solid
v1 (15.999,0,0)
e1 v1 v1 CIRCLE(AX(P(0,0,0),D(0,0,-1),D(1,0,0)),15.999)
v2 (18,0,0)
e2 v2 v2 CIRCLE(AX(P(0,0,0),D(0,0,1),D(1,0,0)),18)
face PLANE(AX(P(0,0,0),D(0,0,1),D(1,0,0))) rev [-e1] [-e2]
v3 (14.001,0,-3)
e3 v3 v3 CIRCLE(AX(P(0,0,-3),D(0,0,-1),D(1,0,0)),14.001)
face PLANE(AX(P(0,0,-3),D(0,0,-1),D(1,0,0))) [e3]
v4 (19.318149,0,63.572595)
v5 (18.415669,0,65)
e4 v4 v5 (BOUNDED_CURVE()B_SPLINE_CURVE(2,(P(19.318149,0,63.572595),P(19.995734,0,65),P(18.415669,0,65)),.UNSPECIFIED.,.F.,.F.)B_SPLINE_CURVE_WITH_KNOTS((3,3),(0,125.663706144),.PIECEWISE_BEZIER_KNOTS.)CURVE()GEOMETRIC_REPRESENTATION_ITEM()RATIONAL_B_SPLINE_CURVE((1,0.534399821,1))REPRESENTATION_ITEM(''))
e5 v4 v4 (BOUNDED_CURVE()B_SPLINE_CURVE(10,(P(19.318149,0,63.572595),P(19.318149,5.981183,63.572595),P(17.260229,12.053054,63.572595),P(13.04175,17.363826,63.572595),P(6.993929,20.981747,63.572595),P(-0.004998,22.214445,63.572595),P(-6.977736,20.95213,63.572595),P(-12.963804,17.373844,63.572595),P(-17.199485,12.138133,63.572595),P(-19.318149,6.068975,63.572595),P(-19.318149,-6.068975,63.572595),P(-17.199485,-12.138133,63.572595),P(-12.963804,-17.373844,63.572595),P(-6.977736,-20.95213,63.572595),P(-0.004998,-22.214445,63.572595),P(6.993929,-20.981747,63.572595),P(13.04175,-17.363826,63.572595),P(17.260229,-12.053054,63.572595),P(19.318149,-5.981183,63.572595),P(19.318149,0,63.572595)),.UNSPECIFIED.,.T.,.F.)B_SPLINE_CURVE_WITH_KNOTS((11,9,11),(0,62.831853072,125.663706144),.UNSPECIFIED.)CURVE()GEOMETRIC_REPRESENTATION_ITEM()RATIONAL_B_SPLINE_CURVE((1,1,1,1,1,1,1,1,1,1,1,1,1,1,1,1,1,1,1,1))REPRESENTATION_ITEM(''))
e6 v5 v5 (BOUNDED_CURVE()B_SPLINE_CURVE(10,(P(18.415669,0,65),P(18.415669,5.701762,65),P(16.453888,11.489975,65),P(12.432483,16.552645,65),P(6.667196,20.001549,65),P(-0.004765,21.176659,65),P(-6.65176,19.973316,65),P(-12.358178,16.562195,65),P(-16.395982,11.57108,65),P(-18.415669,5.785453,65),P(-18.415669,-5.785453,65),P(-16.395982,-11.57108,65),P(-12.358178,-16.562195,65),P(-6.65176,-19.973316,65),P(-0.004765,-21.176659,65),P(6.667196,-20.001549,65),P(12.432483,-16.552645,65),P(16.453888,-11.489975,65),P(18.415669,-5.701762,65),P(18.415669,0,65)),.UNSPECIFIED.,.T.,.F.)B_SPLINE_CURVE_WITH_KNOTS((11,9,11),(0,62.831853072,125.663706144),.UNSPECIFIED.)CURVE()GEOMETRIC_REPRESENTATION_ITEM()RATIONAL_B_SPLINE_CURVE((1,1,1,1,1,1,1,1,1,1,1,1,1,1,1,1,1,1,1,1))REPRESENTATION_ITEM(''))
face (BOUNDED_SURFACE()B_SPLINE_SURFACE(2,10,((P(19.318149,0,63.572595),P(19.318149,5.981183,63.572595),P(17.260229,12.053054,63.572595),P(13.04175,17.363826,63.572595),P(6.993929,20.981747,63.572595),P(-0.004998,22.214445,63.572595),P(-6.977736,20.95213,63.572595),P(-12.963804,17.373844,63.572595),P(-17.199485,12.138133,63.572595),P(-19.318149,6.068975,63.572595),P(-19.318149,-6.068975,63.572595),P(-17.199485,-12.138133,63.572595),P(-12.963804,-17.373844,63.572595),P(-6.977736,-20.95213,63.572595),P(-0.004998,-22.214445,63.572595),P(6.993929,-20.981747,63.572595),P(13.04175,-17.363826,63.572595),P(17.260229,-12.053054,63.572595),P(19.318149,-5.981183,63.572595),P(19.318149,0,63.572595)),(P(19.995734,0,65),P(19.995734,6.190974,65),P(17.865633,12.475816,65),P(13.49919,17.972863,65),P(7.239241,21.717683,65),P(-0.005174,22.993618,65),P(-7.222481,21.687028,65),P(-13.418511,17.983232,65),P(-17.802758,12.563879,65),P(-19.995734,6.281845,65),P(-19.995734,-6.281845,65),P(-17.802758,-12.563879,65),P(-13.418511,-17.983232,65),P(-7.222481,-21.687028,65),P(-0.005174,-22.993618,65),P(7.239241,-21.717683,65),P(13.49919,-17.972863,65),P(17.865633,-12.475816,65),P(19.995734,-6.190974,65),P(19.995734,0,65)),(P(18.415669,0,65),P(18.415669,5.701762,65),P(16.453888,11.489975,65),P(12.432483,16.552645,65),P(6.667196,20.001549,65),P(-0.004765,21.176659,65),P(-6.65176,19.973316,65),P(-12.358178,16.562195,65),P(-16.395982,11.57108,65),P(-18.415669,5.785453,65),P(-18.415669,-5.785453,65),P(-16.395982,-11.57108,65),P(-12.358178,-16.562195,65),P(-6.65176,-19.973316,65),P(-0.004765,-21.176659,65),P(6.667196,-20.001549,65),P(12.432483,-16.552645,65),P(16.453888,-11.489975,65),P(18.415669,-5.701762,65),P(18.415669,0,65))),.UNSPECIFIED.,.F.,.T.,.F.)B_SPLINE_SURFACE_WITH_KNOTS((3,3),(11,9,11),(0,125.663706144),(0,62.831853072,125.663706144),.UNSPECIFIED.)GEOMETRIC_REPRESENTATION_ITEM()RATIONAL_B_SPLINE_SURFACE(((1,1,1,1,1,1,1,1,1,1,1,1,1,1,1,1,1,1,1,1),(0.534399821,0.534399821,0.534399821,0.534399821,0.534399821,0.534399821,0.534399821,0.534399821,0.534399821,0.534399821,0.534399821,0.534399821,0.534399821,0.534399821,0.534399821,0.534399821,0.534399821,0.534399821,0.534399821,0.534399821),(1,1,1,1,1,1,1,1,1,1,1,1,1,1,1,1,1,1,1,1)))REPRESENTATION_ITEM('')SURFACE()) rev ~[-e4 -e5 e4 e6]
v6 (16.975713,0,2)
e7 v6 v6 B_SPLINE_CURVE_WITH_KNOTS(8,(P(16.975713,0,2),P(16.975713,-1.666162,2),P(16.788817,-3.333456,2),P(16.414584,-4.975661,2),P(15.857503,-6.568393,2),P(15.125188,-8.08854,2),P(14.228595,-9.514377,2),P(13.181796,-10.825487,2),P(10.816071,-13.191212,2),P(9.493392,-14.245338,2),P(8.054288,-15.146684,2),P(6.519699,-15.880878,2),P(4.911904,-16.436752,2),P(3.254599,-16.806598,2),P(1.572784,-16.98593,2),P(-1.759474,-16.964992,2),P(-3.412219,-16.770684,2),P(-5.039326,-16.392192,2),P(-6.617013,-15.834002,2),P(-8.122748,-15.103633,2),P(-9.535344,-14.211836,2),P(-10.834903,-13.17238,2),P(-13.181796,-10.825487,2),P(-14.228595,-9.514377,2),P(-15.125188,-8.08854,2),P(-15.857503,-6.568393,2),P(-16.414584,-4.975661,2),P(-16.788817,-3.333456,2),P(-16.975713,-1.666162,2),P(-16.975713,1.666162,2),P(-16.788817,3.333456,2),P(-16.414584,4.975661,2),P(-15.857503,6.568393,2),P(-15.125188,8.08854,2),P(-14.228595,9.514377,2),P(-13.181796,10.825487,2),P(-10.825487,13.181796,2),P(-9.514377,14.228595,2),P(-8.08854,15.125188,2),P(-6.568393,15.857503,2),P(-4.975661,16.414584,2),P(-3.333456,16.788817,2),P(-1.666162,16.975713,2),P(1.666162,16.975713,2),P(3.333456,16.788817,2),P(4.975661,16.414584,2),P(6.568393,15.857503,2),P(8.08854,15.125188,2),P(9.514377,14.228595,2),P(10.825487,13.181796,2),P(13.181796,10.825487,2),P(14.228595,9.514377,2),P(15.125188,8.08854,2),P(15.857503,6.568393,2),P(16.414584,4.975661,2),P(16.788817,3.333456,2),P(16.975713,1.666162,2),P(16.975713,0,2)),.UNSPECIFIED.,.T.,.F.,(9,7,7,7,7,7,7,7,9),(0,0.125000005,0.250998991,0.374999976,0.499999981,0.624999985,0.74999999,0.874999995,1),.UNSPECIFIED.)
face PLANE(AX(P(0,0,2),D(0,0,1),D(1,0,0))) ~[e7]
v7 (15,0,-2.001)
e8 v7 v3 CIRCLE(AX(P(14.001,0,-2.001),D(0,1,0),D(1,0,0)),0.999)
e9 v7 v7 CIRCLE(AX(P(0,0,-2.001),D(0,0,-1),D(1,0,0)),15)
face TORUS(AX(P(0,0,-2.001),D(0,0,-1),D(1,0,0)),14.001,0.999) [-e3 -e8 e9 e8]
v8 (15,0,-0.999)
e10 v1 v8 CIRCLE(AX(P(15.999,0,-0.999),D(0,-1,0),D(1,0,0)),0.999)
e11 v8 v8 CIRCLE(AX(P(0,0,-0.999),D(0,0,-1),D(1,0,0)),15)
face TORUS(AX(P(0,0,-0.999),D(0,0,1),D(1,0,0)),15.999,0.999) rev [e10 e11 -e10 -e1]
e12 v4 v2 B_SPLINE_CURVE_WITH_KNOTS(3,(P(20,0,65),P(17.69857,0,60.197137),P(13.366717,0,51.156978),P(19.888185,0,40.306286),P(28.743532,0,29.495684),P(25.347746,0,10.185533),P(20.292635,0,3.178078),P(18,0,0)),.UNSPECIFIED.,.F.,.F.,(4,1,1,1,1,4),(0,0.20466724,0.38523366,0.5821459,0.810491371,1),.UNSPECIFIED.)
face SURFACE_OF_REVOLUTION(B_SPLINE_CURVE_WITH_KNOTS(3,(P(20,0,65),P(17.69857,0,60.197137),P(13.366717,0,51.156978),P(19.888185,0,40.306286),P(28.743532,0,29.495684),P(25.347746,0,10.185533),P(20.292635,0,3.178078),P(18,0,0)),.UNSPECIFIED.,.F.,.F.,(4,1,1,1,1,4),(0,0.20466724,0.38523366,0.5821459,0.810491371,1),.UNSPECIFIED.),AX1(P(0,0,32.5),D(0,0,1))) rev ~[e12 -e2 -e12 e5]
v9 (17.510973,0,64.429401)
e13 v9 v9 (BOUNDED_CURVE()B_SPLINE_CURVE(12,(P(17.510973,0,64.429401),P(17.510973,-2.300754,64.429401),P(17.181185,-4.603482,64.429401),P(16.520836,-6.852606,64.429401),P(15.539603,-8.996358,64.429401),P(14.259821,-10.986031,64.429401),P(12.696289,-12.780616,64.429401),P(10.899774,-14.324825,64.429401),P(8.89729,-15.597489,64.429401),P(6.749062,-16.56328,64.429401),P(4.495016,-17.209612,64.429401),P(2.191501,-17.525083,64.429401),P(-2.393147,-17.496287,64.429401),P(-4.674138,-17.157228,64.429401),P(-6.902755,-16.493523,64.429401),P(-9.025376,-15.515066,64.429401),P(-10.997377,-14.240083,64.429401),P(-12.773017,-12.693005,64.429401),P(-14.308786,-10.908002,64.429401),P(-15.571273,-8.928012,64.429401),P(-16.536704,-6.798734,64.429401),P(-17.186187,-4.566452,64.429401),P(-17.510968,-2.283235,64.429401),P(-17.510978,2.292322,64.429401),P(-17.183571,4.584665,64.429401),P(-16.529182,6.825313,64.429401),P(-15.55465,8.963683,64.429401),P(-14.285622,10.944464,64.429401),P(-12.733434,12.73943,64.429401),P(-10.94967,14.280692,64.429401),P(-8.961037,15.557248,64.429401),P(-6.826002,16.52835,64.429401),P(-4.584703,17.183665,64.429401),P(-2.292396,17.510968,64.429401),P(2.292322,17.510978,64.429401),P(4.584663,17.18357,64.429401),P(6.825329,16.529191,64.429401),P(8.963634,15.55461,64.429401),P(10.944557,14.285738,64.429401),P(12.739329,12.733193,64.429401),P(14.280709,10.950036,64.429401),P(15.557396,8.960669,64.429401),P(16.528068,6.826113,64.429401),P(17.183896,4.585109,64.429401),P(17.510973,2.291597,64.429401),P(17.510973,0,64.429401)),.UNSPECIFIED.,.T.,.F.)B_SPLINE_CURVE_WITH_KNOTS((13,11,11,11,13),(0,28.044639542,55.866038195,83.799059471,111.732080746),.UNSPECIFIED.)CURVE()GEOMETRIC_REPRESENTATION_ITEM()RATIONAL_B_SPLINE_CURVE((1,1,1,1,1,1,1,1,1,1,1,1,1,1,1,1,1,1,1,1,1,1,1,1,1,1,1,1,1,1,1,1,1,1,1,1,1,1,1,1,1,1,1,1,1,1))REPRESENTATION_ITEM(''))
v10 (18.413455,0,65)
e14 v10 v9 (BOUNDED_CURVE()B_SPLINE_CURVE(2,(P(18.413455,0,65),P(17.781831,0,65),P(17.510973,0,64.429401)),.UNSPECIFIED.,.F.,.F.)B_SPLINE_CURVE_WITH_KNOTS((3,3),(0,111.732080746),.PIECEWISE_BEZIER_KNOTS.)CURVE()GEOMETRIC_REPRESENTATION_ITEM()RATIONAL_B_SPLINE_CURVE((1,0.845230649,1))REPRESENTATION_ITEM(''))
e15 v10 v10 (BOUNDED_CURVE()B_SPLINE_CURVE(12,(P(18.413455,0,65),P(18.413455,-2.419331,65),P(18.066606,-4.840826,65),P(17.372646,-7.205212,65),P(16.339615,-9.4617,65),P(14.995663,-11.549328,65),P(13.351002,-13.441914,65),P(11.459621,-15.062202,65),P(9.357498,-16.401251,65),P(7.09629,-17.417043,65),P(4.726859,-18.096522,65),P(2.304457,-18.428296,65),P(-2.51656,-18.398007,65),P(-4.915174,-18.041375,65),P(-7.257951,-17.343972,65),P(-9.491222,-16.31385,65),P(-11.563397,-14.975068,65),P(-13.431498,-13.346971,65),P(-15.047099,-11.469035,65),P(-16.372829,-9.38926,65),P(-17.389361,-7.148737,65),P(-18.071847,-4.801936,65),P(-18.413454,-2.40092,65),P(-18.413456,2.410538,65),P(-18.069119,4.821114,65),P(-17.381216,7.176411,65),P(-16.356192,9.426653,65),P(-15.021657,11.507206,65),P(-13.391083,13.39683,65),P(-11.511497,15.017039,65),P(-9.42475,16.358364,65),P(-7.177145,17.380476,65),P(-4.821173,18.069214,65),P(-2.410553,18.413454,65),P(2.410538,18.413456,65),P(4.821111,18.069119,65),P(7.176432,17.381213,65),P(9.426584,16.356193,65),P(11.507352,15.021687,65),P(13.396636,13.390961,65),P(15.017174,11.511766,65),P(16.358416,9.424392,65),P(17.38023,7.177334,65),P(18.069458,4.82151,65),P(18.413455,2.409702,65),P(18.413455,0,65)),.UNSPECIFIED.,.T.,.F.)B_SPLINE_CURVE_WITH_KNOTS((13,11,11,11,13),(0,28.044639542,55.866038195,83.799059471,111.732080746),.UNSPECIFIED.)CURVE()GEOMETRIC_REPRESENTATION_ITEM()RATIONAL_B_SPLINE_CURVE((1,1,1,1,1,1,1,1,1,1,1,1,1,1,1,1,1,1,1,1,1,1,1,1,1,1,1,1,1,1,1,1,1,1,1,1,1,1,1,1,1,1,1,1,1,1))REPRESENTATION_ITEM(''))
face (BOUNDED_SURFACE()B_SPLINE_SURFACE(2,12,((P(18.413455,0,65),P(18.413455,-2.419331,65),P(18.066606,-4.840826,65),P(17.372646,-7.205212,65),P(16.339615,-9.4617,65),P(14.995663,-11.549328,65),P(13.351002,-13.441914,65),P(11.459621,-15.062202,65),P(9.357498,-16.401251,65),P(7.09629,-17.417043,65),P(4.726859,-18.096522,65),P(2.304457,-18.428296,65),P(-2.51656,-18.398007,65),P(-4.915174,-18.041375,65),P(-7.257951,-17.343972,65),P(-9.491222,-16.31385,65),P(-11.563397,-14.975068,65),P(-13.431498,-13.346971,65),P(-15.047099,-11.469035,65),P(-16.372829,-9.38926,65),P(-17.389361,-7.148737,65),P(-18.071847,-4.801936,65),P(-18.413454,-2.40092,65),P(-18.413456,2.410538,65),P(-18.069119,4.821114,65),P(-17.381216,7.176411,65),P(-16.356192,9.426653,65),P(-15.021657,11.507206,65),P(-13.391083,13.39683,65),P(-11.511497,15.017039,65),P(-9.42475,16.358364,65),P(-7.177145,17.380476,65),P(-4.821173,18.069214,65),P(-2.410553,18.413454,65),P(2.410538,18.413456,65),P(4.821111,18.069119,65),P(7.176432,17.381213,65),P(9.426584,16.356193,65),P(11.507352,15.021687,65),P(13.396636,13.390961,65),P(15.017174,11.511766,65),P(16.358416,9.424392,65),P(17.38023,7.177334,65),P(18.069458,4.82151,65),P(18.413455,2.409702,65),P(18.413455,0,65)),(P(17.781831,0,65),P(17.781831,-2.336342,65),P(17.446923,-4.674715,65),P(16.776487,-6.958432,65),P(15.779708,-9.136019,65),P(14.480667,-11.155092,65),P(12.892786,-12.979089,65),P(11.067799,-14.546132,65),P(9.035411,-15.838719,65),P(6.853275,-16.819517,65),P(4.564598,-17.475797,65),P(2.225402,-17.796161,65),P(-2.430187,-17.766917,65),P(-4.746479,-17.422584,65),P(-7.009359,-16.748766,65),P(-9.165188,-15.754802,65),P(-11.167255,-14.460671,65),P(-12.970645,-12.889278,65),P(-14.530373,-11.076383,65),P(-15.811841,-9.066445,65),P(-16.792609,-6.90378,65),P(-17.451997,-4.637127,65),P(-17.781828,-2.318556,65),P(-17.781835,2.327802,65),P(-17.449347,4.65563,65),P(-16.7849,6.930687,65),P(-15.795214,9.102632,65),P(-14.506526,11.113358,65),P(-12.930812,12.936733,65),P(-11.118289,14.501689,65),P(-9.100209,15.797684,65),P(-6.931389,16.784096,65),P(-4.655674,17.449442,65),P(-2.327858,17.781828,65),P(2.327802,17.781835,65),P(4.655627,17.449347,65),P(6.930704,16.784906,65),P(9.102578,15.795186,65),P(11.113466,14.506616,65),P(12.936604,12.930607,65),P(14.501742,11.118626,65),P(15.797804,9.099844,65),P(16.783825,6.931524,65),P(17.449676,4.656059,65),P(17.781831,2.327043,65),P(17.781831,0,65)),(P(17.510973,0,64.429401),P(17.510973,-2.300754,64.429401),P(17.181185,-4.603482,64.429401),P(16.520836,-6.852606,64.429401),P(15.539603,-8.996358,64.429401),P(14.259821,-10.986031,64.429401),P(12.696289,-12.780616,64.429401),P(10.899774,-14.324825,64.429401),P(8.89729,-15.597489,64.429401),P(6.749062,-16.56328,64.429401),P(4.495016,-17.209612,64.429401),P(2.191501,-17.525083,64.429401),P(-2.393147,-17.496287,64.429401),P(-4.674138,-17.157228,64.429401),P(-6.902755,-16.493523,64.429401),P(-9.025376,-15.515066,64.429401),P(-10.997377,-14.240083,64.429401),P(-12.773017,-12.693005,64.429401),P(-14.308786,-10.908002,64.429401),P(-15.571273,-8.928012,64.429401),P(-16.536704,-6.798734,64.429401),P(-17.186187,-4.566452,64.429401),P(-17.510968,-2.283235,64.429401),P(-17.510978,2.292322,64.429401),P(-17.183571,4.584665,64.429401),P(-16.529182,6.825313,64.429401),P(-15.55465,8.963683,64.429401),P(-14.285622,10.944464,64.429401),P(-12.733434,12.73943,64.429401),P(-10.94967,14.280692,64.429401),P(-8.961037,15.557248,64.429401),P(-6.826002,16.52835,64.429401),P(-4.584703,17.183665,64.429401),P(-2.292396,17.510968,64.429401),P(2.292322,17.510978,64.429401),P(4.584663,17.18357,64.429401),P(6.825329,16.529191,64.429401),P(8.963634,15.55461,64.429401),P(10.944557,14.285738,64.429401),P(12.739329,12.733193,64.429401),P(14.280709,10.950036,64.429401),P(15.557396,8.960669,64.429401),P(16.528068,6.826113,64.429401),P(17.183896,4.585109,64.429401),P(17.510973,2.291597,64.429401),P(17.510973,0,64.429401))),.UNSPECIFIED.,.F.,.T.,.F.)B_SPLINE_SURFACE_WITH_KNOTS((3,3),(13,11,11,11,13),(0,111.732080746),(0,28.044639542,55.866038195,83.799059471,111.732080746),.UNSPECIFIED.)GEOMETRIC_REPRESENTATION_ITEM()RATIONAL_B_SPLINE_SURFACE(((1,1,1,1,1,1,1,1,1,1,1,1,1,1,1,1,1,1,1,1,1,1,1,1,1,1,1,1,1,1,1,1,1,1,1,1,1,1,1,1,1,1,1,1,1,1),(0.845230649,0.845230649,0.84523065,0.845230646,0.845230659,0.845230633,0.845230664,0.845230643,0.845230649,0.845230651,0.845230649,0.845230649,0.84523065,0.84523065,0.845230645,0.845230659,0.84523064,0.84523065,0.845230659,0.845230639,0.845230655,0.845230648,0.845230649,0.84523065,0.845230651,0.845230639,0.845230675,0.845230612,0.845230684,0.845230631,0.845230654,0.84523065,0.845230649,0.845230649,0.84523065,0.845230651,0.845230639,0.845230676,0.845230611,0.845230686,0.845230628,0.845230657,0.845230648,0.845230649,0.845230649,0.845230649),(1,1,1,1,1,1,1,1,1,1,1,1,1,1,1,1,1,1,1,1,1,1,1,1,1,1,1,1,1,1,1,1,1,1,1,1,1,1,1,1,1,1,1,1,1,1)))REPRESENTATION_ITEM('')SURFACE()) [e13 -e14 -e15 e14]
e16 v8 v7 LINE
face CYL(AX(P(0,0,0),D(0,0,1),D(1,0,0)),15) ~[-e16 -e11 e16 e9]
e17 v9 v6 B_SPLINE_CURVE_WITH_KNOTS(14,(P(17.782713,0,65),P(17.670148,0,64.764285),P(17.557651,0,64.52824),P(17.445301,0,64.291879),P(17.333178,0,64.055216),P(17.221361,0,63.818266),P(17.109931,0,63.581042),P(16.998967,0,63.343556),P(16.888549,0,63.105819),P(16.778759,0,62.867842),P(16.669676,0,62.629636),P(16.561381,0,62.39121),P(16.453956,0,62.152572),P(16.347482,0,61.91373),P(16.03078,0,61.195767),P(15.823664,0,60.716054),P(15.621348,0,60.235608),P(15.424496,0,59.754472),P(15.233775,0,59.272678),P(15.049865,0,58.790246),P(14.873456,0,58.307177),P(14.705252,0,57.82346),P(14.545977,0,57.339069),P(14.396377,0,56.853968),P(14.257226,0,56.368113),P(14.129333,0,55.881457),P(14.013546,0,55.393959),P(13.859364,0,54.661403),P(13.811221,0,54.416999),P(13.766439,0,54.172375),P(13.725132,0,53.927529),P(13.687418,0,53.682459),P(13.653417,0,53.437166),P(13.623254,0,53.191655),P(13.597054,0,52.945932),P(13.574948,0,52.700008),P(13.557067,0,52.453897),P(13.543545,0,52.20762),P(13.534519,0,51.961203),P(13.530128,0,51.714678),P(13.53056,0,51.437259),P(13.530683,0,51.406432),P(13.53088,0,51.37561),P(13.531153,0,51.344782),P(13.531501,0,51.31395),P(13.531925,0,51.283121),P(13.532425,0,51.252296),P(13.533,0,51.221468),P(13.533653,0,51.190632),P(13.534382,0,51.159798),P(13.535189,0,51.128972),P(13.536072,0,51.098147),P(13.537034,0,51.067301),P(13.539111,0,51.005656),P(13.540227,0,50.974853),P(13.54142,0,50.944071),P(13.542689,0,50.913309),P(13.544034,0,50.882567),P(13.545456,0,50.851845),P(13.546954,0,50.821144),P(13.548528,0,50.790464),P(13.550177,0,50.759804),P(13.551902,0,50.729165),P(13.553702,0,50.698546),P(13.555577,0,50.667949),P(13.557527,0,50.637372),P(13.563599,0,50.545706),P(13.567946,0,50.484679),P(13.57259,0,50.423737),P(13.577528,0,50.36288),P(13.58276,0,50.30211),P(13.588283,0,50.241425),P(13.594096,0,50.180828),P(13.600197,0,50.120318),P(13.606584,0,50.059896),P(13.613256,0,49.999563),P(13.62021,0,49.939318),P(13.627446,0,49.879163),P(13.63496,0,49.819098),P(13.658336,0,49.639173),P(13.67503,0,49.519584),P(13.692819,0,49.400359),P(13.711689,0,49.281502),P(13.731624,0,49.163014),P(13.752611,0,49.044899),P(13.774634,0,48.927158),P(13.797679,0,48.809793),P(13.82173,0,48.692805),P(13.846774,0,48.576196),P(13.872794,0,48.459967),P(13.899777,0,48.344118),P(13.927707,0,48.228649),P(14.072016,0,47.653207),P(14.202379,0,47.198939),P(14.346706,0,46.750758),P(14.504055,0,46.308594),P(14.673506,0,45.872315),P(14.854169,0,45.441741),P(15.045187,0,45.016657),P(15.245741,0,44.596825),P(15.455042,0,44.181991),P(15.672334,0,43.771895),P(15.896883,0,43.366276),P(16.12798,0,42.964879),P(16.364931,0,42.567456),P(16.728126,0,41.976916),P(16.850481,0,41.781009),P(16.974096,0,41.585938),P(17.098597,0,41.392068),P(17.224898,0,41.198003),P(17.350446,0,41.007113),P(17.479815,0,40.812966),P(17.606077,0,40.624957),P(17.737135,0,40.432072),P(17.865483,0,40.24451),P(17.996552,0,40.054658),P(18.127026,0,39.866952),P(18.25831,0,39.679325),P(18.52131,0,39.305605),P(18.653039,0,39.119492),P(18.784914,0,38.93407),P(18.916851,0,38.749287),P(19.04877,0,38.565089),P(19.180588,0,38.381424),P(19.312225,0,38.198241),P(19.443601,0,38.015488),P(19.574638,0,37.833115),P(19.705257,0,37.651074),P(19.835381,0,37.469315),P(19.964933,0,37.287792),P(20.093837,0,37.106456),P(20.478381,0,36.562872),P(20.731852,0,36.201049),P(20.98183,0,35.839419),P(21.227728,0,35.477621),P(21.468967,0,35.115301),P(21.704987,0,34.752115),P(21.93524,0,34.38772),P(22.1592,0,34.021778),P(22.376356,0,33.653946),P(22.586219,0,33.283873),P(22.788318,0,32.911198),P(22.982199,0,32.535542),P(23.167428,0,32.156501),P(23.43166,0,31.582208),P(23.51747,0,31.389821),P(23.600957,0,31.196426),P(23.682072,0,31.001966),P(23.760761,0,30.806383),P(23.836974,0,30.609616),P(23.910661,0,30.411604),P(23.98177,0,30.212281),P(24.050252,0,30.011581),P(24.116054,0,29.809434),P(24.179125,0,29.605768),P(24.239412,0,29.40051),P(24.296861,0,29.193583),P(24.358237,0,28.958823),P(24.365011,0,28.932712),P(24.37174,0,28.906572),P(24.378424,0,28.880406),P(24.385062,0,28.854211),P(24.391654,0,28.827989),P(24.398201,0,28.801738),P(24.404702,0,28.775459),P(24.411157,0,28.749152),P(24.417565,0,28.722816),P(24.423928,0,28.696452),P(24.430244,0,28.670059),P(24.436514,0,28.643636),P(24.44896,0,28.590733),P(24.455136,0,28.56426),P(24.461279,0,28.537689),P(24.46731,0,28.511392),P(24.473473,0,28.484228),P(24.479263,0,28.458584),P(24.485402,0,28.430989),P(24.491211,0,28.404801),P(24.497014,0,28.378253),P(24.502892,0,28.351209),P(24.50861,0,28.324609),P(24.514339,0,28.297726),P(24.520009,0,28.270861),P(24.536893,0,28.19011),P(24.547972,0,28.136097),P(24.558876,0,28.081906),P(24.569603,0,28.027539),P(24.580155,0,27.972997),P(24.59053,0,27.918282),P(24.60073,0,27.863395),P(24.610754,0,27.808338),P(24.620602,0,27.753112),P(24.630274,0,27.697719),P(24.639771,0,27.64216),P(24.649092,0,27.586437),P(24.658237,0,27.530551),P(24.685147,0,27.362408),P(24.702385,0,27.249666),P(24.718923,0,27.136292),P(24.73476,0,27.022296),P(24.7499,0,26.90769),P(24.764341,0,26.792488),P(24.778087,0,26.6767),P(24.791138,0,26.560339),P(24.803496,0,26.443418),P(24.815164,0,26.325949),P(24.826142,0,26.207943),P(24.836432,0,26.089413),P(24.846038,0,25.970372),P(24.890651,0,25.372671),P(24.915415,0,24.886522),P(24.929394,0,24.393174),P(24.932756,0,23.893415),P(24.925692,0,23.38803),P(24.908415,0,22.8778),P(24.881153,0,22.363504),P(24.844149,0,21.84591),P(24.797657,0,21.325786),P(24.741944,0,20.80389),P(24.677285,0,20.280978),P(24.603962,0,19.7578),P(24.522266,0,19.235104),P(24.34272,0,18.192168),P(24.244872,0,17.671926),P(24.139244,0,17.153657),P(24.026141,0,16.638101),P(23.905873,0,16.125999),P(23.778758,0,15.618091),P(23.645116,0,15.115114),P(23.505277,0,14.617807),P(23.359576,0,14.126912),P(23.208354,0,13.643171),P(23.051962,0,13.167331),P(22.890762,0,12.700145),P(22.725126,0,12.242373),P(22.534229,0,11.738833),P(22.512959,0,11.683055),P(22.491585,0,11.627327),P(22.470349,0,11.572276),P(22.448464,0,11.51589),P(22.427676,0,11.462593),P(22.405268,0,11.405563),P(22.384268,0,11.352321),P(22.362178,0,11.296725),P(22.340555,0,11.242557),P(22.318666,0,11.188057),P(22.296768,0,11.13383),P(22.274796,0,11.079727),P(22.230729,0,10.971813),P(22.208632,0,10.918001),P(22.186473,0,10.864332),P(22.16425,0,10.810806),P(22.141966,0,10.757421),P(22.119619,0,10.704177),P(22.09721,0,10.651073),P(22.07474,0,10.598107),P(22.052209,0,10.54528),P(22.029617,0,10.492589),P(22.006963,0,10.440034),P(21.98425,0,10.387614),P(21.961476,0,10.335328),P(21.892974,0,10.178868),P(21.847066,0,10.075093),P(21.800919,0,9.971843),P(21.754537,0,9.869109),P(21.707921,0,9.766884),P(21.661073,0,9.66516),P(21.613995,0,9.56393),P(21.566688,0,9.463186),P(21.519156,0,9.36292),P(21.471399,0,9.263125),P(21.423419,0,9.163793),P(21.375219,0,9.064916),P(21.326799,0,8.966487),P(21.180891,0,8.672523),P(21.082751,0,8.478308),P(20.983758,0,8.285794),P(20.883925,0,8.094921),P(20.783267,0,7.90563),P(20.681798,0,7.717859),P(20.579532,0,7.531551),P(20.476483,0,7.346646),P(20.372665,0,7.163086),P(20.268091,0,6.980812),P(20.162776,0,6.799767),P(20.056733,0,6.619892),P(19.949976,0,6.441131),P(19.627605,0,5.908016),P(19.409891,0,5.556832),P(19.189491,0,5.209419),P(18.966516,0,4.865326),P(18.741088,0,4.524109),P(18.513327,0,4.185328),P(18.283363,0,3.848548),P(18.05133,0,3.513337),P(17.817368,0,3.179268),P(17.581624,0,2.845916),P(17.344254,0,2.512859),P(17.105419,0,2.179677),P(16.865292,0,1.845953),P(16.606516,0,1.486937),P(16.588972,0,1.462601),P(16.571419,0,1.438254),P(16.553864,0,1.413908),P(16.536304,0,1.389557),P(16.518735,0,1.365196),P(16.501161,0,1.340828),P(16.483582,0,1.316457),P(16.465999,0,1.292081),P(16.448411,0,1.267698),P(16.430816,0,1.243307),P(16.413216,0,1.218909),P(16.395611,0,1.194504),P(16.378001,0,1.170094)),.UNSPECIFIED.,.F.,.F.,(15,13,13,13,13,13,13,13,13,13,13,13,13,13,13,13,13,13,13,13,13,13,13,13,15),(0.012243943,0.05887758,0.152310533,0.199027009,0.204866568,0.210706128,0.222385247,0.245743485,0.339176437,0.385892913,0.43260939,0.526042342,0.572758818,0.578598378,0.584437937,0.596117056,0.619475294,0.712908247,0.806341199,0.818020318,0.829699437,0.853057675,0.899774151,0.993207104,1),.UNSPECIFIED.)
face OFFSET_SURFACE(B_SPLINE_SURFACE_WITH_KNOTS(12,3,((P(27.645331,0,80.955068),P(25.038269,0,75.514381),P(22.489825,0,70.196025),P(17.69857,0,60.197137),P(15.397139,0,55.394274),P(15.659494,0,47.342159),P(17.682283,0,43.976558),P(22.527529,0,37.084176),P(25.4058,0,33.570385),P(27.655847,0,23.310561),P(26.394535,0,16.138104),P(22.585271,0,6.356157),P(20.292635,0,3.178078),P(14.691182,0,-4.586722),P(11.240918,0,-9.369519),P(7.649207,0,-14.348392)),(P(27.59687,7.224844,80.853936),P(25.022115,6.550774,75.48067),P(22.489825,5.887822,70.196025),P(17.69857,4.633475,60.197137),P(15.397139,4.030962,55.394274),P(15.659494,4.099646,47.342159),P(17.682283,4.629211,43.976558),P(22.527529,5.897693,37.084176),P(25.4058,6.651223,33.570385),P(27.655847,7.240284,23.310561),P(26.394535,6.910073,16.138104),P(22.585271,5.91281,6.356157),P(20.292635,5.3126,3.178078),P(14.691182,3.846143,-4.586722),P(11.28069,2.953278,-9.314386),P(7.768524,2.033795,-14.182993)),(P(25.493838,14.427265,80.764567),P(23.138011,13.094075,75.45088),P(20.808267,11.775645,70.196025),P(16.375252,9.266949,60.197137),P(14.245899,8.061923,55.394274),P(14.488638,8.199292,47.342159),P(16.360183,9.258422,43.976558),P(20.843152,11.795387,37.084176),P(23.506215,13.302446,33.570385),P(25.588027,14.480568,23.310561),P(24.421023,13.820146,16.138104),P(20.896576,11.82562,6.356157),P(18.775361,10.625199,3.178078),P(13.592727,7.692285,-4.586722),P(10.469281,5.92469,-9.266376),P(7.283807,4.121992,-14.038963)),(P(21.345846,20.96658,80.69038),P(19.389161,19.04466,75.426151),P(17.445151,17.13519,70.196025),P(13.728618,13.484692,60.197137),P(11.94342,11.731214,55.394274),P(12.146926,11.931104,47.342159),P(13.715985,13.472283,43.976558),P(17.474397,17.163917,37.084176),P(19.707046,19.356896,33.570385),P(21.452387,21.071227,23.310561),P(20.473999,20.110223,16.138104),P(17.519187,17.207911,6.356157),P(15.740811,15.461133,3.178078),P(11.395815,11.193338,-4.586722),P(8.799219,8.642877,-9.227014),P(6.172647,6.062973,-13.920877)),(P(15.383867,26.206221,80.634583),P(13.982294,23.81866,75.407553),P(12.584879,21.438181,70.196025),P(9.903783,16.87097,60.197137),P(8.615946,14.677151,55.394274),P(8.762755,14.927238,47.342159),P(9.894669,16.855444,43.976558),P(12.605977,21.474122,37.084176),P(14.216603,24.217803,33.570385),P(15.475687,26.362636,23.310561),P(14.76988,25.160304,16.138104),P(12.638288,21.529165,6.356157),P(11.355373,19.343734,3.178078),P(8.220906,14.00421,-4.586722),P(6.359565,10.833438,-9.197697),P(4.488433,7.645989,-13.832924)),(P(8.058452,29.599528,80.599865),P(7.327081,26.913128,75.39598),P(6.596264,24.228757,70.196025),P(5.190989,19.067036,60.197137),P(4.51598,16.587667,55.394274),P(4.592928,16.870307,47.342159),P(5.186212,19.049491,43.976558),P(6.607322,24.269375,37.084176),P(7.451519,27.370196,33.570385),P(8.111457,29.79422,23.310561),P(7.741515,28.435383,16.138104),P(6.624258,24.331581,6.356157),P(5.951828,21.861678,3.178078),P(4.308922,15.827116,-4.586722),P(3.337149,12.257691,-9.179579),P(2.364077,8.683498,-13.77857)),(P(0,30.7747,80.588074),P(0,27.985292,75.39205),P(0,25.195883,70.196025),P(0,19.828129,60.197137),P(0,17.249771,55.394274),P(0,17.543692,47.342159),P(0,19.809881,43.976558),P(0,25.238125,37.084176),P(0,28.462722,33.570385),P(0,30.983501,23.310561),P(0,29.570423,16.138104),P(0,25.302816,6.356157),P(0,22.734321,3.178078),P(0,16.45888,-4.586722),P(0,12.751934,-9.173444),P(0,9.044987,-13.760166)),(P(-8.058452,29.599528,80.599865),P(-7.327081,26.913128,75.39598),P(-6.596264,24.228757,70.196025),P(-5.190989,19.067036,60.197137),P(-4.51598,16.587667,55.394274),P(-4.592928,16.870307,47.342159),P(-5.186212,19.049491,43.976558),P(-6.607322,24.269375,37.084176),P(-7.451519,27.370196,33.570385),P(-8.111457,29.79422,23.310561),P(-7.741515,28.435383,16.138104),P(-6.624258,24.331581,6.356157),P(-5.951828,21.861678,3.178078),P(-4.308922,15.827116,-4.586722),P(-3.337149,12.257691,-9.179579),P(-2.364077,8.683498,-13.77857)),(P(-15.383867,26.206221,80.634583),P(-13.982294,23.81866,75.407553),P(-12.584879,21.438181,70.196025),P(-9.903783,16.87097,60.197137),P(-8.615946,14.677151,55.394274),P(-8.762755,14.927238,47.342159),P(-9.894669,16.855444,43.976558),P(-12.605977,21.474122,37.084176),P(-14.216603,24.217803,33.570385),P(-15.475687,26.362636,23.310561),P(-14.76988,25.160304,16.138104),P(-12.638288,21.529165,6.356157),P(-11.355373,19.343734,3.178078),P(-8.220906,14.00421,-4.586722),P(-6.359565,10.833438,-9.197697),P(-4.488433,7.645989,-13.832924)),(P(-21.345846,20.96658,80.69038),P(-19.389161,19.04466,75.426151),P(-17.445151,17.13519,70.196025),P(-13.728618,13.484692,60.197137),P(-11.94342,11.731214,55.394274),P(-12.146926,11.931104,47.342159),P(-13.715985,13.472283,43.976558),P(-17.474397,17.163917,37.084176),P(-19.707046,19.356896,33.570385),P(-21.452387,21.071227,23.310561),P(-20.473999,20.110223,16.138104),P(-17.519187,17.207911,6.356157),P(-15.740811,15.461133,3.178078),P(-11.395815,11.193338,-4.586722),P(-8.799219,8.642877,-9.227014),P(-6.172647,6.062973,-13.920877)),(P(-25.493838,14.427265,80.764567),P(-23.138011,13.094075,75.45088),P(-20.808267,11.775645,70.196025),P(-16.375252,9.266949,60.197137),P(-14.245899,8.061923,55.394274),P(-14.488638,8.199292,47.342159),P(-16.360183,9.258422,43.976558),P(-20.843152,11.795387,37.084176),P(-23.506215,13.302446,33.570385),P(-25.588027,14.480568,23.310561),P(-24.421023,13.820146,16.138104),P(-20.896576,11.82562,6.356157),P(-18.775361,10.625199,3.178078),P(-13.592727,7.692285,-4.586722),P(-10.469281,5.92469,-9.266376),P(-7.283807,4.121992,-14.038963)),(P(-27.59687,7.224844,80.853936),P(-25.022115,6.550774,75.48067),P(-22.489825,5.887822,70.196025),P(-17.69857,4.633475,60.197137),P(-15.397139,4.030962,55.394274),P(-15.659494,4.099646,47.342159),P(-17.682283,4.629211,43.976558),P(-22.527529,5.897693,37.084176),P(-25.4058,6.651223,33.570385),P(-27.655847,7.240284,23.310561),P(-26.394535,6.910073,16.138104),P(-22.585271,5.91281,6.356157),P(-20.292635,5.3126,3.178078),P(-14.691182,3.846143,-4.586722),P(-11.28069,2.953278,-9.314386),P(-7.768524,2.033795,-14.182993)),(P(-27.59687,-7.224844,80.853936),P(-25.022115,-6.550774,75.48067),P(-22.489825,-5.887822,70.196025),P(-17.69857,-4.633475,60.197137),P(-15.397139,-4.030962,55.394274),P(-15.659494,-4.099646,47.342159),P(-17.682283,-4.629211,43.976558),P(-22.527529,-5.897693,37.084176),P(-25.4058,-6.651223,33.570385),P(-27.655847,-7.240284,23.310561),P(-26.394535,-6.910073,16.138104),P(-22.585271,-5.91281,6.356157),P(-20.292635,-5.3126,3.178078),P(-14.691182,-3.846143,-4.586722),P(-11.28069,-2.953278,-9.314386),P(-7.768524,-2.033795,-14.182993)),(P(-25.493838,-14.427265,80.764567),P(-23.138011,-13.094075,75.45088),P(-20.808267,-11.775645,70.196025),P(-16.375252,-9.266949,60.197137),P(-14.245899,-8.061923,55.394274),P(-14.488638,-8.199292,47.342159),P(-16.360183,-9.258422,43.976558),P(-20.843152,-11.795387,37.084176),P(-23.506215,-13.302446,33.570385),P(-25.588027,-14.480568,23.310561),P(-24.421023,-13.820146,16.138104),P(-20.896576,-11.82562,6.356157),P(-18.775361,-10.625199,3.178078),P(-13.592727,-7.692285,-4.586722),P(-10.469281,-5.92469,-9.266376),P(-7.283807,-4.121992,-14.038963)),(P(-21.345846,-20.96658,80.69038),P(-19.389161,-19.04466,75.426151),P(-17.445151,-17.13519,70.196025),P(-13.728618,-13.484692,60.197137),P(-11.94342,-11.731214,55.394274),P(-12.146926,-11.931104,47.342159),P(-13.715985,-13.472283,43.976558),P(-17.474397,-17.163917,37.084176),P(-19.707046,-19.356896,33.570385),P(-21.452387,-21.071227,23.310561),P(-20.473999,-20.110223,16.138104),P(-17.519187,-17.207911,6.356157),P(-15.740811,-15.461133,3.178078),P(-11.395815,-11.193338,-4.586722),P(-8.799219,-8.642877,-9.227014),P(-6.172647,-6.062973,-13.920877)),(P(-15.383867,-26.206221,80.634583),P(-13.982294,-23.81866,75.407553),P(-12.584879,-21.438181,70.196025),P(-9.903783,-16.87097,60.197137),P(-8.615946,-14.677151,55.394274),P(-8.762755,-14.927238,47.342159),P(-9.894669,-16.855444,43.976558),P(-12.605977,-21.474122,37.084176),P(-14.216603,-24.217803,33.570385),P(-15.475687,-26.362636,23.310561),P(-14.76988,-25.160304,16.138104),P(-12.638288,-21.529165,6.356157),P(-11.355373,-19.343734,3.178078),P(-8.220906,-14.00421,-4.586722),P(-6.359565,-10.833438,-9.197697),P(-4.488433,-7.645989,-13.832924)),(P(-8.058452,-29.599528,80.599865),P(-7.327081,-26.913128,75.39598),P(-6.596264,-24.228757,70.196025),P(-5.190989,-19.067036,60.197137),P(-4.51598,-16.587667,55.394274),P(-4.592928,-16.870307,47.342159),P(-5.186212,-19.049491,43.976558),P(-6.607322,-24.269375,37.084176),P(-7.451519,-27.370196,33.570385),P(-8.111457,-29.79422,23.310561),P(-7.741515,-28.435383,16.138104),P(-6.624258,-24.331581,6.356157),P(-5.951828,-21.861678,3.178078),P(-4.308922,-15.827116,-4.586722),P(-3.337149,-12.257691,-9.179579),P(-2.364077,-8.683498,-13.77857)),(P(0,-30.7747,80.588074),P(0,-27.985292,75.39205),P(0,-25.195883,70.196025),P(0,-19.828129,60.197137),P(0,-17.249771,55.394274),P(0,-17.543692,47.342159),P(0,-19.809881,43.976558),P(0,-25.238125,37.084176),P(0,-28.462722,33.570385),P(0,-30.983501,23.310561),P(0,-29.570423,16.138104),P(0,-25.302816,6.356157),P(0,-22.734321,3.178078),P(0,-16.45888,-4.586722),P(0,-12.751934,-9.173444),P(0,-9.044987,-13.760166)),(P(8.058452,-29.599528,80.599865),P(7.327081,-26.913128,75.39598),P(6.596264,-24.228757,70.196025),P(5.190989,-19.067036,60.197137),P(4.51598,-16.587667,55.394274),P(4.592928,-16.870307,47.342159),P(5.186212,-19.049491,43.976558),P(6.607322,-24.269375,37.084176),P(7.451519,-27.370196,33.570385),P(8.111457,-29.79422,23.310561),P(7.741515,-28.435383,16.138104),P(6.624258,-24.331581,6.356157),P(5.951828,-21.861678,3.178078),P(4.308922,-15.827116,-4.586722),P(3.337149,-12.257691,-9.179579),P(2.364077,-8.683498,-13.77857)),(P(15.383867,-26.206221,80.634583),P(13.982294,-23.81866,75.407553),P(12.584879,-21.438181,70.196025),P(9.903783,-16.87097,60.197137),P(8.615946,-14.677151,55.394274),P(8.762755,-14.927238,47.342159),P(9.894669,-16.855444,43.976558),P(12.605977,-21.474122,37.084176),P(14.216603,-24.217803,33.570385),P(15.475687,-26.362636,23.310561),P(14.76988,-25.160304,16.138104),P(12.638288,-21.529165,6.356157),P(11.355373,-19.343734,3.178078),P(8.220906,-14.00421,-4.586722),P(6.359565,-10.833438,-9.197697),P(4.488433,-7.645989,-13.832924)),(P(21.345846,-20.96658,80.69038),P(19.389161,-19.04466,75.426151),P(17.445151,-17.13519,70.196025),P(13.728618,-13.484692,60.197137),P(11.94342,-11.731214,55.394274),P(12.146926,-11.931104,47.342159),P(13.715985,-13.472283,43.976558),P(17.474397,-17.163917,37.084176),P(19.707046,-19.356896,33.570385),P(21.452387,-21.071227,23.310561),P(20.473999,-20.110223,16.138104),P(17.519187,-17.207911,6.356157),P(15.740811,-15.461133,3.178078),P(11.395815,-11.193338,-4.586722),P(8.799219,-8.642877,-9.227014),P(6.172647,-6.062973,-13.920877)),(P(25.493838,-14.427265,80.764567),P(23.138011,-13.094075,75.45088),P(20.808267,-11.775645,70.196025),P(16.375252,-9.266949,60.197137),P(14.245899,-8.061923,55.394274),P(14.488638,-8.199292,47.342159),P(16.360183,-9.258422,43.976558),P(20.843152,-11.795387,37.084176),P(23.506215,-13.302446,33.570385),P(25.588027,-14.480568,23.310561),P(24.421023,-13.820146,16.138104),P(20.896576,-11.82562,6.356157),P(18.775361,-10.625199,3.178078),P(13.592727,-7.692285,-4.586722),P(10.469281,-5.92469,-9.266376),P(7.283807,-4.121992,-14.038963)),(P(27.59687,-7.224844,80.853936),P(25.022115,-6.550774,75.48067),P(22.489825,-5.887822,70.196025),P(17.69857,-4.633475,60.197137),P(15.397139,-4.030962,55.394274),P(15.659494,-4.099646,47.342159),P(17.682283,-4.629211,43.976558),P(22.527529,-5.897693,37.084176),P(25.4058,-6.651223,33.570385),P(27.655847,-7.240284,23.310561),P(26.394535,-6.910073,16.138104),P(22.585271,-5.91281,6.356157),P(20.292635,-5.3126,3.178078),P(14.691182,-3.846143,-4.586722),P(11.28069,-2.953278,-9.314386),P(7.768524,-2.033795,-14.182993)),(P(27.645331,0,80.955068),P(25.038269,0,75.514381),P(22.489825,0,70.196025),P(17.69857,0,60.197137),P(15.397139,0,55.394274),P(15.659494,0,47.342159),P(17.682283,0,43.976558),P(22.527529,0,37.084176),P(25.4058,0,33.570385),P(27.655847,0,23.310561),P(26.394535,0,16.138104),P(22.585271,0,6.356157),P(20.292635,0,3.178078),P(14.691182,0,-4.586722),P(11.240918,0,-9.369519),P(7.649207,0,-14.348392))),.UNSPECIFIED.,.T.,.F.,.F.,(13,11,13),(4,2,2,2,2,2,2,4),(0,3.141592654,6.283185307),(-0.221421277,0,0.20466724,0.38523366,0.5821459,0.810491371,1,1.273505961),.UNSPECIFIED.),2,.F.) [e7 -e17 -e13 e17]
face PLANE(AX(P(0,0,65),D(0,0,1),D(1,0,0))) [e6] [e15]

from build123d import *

# Parameters (mm, degrees)
F2_T     = -2
F3_R     = 15
F4_DEPTH = 3
F5_R     = 0.999


# Not quite as in the source:
# - a fillet or chamfer is up to 0.001 mm smaller than in the source, because OpenCascade refuses the exact size


with BuildPart() as f1:
    # F0 (on Front) → F1 (revolve)
    with BuildSketch(Plane.XZ):
        with BuildLine():
            Line((0, 65), (0, 0))
            Line((0, 0), (18, 0))
            add(Edge.make_bspline(
                [(20, 65), (17.6985697232, 60.1971369933), (13.3667166838, 51.1569775224), (19.8881851872, 40.3062857529), (28.7435315854, 29.4956838783), (25.3477464302, 10.1855330561), (20.2926354933, 3.1780784523), (18, 0)],
                knots=[0, 0, 0, 0, 0.2046672405, 0.3852336596, 0.5821458997, 0.8104913713, 1, 1, 1, 1], degree=3))
            Line((20, 65), (0, 65))
        make_face()
    revolve(axis=Axis((0, 0, 32.5), (0, 0, 1)))

    # F2
    f2_openings = [f1.faces().sort_by_distance(p)[0] for p in [
        (0, 0, 65),
    ]]
    offset(amount=F2_T, openings=f2_openings)

    # F3 (on face) → F4 (join)
    with BuildSketch(Plane(origin=(0, 0, 0), x_dir=(1, 0, 0), z_dir=(0, 0, -1))):
        Circle(F3_R)
    extrude(amount=F4_DEPTH)

    # F5 (radius 1 in the source; OpenCascade refuses exactly that, so slightly less here)
    f5_edges = [f1.edges().sort_by_distance(p)[0] for p in [
        (15, 0, -1.5),
        (-15, 0, 0),
        (-15, 0, -3),
        (-20, 0, 65),
        (-17.782713, 0, 65),
    ]]
    fillet(f5_edges, radius=F5_R)


solid = f1.part
